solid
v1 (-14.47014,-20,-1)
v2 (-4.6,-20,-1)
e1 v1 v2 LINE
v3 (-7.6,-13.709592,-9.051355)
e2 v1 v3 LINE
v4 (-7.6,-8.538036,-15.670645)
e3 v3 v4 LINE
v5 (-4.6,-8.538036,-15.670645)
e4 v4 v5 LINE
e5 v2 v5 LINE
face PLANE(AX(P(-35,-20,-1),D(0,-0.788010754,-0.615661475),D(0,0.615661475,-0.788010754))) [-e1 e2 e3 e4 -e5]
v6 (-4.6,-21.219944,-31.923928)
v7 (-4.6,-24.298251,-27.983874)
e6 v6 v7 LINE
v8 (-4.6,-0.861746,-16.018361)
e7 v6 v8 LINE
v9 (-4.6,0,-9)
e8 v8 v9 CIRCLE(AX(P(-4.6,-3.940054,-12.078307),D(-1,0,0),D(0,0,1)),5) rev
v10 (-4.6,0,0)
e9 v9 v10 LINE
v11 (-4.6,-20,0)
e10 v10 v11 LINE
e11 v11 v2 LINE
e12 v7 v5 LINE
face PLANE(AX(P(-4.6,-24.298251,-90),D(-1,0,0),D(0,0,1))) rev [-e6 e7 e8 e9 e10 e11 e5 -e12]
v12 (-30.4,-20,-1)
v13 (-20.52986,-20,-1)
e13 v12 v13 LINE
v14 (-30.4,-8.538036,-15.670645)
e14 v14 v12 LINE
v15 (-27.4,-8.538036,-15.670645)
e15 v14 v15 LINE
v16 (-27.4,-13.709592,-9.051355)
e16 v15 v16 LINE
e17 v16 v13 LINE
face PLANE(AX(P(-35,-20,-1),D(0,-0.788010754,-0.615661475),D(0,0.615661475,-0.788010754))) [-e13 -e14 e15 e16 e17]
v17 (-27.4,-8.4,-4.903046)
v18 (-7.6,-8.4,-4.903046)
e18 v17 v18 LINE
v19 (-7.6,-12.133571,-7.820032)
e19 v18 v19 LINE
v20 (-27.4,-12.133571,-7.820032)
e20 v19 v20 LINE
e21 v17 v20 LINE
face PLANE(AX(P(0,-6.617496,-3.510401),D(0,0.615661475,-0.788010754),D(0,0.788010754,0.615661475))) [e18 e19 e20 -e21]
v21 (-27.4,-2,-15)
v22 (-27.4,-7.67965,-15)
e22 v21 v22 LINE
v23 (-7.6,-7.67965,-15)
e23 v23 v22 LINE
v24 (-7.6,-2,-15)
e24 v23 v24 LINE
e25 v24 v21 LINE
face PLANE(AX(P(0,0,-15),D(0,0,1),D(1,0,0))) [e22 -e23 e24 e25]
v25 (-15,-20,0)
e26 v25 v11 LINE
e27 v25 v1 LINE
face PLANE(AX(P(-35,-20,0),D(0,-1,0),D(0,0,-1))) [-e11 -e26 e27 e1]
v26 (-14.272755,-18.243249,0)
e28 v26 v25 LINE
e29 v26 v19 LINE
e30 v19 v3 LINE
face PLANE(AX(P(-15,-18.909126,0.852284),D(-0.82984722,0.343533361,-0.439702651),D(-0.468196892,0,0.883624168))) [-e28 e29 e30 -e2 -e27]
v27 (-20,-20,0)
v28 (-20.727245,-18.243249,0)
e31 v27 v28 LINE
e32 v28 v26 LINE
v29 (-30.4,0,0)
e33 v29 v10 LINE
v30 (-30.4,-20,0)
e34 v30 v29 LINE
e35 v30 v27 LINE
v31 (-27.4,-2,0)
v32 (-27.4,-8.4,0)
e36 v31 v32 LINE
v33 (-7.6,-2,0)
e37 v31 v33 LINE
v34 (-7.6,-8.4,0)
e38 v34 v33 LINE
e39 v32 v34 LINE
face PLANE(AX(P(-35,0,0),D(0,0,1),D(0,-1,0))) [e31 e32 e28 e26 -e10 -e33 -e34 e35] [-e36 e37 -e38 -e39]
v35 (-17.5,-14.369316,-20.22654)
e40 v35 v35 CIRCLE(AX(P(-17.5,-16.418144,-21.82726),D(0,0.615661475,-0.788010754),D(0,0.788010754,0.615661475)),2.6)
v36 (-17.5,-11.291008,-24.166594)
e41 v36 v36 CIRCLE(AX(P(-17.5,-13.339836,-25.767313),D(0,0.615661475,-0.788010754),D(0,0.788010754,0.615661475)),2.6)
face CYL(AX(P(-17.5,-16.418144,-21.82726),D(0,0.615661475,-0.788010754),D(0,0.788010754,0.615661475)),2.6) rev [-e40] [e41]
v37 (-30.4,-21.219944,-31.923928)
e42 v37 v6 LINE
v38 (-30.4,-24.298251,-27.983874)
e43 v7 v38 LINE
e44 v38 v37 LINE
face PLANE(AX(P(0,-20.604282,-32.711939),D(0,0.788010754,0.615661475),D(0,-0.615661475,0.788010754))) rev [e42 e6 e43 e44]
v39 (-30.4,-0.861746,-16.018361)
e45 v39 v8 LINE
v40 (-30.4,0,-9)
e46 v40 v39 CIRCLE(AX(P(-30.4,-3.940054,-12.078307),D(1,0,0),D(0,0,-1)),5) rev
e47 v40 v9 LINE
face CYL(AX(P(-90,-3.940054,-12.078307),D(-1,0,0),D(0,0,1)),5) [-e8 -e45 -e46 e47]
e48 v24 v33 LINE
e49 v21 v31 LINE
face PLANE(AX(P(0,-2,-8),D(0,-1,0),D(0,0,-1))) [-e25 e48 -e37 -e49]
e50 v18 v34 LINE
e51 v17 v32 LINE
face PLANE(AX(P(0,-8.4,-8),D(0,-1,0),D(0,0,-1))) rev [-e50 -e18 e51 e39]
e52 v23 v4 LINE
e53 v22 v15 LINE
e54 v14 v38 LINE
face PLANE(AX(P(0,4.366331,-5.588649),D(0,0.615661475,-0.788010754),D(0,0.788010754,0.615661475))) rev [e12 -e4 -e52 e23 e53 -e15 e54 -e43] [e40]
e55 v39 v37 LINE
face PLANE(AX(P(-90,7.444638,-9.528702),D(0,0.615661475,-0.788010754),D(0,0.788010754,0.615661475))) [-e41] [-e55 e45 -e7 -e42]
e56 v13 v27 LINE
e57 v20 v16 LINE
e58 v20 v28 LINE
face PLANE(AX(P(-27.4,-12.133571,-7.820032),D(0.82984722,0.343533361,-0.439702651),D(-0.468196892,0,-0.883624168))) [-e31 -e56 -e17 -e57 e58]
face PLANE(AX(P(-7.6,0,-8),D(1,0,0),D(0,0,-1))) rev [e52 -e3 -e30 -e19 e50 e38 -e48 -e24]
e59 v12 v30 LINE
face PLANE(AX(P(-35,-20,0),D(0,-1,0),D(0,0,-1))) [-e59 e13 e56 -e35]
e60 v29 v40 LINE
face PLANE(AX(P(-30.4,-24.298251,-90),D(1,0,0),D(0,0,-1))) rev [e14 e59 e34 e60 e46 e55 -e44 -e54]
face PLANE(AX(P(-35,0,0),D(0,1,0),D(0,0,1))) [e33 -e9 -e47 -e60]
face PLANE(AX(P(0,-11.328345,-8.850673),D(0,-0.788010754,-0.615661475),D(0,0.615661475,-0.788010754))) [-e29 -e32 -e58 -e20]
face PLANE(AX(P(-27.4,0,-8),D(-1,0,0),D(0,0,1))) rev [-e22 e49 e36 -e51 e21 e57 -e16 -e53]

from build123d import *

# Parameters (mm, degrees)
EXTRUDE_1_DEPTH         = 35
CUT_EXTRUDE_1_DEPTH     = 8
CUT_EXTRUDE_2_DEPTH     = 9
EXTRUDE_2_DEPTH         = 6
CUT_EXTRUDE_3_DEPTH     = 3
SKETCH_9_R              = 2.6
CUT_EXTRUDE_4_DEPTH     = 3
CUT_EXTRUDE_5_DEPTH     = 90
SKETCH_11_R             = 5
SKETCH_11_R_2           = 2.6
EXTRUDE_3_DEPTH         = 2
FILLET_1_R              = 5
CUT_EXTRUDE_6_DEPTH     = 2
CUT_EXTRUDE_START       = -31.92392812
CUT_EXTRUDE_7_OUTLINE_W = 4.6
CUT_EXTRUDE_7_OUTLINE_H = 29
CUT_EXTRUDE_7_DEPTH     = 31.92392812
SKETCH_18_W             = 19.8
SKETCH_18_H             = 6.4
CUT_EXTRUDE_8_DEPTH     = 15
SKETCH_19_W             = 19.8
SKETCH_19_H             = 2
CUT_EXTRUDE_9_DEPTH     = 3


# Read off the part's stored shape, not the designer's step: 切除-拉伸7
with BuildPart() as part:
    # 草图1 → 凸台-拉伸1 (new body)
    with BuildSketch(Plane(origin=(0, 0, 0), x_dir=(0, 0, -1), z_dir=(1, 0, 0))):
        Polygon((0, 0), (9, 0), (15.670644845, -8.538036051), (1, -20), (0, -20), align=None)
    extrude(amount=-EXTRUDE_1_DEPTH)

    # 草图5 → 切除-拉伸1 (cut)
    with BuildSketch(Plane.XY):
        Polygon((-27.4, -8.4), (-7.6, -8.4), (-7.6, -2), (-17.5, -2), (-27.4, -2), align=None)
    extrude(amount=-CUT_EXTRUDE_1_DEPTH, mode=Mode.SUBTRACT)

    # 草图6 → 切除-拉伸2 (cut)
    with BuildSketch(Plane(origin=(0, -12.904366819, -10.081996315), x_dir=(1, 0, 0), z_dir=(0, -0.788010753606721, -0.6156614753256595))):
        Polygon((-7.6, 1.307903218), (-7.6, -5.092096782), (-17.5, -5.092096782), (-27.4, -5.092096782), (-27.4, 1.307903218), align=None)
    extrude(amount=-CUT_EXTRUDE_2_DEPTH, mode=Mode.SUBTRACT)

    # 草图7 → 凸台-拉伸2 (add)
    with BuildSketch(Plane(origin=(0, 4.366330768, -5.58864853), x_dir=(-1, 0, 0), z_dir=(0, 0.6156614753256597, -0.7880107536067209))):
        Polygon((0, -5.540953278), (35, -5.540953278), (35, -16.375876547), (35, -36.375876547), (0, -36.375876547), (0, -16.375876547), align=None)
    extrude(amount=EXTRUDE_2_DEPTH)

    # 草图8 → 切除-拉伸3 (cut)
    with BuildSketch(Plane(origin=(0, 8.06029962, -10.316713052), x_dir=(-1, 0, 0), z_dir=(0, 0.6156614753256597, -0.7880107536067209))):
        with BuildLine():
            ThreePointArc((13.158784289, -23.895181856), (15.019305308, -30.717092258), (21.841215711, -28.856571239))
            Line((21.841215711, -28.856571239), (13.158784289, -23.895181856))
        make_face()
        with BuildLine():
            Line((13.158784289, -23.895181856), (21.841215711, -28.856571239))
            ThreePointArc((21.841215711, -28.856571239), (22.332498244, -27.659216223), (22.5, -26.375876547))
            ThreePointArc((22.5, -26.375876547), (18.783339676, -21.543378304), (13.158784289, -23.895181856))
        make_face()
    extrude(amount=-CUT_EXTRUDE_3_DEPTH, mode=Mode.SUBTRACT)

    # 草图9 → 切除-拉伸4 (cut)
    with BuildSketch(Plane(origin=(0, 6.213315194, -7.952680791), x_dir=(-1, 0, 0), z_dir=(0, 0.6156614753256597, -0.7880107536067209))):
        with Locations(Location((17.5, -26.375876547, 0), (0, 0, 90))):
            Circle(SKETCH_9_R)
    extrude(amount=-CUT_EXTRUDE_4_DEPTH, mode=Mode.SUBTRACT)

    # 草图10 → 切除-拉伸5 (cut)
    with BuildSketch(Plane(origin=(0, 0, 0), x_dir=(0, 0, -1), z_dir=(1, 0, 0))):
        Polygon((12.940053768, 3.078307377), (31.92392812, -21.219943746), (32.711938873, -20.604282271), (13.728064522, 3.693968852), align=None)
    extrude(amount=-CUT_EXTRUDE_5_DEPTH, mode=Mode.SUBTRACT)

    # 草图11 → 凸台-拉伸3 (add)
    with BuildSketch(Plane(origin=(0, 7.444638145, -9.528702298), x_dir=(-1, 0, 0), z_dir=(0, 0.6156614753256598, -0.7880107536067208))):
        with Locations((17.5, -26.375876547)):
            Circle(SKETCH_11_R)
        with Locations(Location((17.5, -26.375876547, 0), (0, 0, 90))):
            Circle(SKETCH_11_R_2, mode=Mode.SUBTRACT)
    extrude(amount=-EXTRUDE_3_DEPTH)

    # 圆角1
    fillet_1_edges = [part.edges().sort_by_distance(p)[0] for p in [
        (-17.5, 3.078307377, -12.940053768),
    ]]
    fillet(fillet_1_edges, radius=FILLET_1_R - 0.0001)  # a hair under: the kernel refuses the full size

    # 草图16 → 切除-拉伸6 (cut)
    with BuildSketch(Plane(origin=(0, -12.904366819, -10.081996315), x_dir=(1, 0, 0), z_dir=(0, -0.788010753606721, -0.6156614753256595))):
        Polygon((-27.4, 1.307903218), (-20, 12.313229507), (-15, 12.313229507), (-7.6, 1.307903218), align=None)
    extrude(amount=-CUT_EXTRUDE_6_DEPTH, mode=Mode.SUBTRACT)

    # 切除-拉伸7 outline → 切除-拉伸7 (cut)
    with BuildSketch(Plane.XY.offset(CUT_EXTRUDE_START)):
        with Locations((-32.7, -11.5)):
            Rectangle(CUT_EXTRUDE_7_OUTLINE_W, CUT_EXTRUDE_7_OUTLINE_H)
        with Locations((-2.3, -11.5)):
            Rectangle(CUT_EXTRUDE_7_OUTLINE_W, CUT_EXTRUDE_7_OUTLINE_H)
    extrude(amount=CUT_EXTRUDE_7_DEPTH, mode=Mode.SUBTRACT)

    # 草图18 → 切除-拉伸8 (cut)
    with BuildSketch(Plane.XY):
        with Locations((-17.5, -5.2)):
            Rectangle(SKETCH_18_W, SKETCH_18_H)
    extrude(amount=-CUT_EXTRUDE_8_DEPTH, mode=Mode.SUBTRACT)

    # 草图19 → 切除-拉伸9 (cut)
    with BuildSketch(Plane(origin=(0, -12.904366819, -10.081996315), x_dir=(1, 0, 0), z_dir=(0, -0.788010753606721, -0.6156614753256595))):
        with Locations((-17.5, -6.092096782)):
            Rectangle(SKETCH_19_W, SKETCH_19_H)
    extrude(amount=-CUT_EXTRUDE_9_DEPTH, mode=Mode.SUBTRACT)


solid = part.part
